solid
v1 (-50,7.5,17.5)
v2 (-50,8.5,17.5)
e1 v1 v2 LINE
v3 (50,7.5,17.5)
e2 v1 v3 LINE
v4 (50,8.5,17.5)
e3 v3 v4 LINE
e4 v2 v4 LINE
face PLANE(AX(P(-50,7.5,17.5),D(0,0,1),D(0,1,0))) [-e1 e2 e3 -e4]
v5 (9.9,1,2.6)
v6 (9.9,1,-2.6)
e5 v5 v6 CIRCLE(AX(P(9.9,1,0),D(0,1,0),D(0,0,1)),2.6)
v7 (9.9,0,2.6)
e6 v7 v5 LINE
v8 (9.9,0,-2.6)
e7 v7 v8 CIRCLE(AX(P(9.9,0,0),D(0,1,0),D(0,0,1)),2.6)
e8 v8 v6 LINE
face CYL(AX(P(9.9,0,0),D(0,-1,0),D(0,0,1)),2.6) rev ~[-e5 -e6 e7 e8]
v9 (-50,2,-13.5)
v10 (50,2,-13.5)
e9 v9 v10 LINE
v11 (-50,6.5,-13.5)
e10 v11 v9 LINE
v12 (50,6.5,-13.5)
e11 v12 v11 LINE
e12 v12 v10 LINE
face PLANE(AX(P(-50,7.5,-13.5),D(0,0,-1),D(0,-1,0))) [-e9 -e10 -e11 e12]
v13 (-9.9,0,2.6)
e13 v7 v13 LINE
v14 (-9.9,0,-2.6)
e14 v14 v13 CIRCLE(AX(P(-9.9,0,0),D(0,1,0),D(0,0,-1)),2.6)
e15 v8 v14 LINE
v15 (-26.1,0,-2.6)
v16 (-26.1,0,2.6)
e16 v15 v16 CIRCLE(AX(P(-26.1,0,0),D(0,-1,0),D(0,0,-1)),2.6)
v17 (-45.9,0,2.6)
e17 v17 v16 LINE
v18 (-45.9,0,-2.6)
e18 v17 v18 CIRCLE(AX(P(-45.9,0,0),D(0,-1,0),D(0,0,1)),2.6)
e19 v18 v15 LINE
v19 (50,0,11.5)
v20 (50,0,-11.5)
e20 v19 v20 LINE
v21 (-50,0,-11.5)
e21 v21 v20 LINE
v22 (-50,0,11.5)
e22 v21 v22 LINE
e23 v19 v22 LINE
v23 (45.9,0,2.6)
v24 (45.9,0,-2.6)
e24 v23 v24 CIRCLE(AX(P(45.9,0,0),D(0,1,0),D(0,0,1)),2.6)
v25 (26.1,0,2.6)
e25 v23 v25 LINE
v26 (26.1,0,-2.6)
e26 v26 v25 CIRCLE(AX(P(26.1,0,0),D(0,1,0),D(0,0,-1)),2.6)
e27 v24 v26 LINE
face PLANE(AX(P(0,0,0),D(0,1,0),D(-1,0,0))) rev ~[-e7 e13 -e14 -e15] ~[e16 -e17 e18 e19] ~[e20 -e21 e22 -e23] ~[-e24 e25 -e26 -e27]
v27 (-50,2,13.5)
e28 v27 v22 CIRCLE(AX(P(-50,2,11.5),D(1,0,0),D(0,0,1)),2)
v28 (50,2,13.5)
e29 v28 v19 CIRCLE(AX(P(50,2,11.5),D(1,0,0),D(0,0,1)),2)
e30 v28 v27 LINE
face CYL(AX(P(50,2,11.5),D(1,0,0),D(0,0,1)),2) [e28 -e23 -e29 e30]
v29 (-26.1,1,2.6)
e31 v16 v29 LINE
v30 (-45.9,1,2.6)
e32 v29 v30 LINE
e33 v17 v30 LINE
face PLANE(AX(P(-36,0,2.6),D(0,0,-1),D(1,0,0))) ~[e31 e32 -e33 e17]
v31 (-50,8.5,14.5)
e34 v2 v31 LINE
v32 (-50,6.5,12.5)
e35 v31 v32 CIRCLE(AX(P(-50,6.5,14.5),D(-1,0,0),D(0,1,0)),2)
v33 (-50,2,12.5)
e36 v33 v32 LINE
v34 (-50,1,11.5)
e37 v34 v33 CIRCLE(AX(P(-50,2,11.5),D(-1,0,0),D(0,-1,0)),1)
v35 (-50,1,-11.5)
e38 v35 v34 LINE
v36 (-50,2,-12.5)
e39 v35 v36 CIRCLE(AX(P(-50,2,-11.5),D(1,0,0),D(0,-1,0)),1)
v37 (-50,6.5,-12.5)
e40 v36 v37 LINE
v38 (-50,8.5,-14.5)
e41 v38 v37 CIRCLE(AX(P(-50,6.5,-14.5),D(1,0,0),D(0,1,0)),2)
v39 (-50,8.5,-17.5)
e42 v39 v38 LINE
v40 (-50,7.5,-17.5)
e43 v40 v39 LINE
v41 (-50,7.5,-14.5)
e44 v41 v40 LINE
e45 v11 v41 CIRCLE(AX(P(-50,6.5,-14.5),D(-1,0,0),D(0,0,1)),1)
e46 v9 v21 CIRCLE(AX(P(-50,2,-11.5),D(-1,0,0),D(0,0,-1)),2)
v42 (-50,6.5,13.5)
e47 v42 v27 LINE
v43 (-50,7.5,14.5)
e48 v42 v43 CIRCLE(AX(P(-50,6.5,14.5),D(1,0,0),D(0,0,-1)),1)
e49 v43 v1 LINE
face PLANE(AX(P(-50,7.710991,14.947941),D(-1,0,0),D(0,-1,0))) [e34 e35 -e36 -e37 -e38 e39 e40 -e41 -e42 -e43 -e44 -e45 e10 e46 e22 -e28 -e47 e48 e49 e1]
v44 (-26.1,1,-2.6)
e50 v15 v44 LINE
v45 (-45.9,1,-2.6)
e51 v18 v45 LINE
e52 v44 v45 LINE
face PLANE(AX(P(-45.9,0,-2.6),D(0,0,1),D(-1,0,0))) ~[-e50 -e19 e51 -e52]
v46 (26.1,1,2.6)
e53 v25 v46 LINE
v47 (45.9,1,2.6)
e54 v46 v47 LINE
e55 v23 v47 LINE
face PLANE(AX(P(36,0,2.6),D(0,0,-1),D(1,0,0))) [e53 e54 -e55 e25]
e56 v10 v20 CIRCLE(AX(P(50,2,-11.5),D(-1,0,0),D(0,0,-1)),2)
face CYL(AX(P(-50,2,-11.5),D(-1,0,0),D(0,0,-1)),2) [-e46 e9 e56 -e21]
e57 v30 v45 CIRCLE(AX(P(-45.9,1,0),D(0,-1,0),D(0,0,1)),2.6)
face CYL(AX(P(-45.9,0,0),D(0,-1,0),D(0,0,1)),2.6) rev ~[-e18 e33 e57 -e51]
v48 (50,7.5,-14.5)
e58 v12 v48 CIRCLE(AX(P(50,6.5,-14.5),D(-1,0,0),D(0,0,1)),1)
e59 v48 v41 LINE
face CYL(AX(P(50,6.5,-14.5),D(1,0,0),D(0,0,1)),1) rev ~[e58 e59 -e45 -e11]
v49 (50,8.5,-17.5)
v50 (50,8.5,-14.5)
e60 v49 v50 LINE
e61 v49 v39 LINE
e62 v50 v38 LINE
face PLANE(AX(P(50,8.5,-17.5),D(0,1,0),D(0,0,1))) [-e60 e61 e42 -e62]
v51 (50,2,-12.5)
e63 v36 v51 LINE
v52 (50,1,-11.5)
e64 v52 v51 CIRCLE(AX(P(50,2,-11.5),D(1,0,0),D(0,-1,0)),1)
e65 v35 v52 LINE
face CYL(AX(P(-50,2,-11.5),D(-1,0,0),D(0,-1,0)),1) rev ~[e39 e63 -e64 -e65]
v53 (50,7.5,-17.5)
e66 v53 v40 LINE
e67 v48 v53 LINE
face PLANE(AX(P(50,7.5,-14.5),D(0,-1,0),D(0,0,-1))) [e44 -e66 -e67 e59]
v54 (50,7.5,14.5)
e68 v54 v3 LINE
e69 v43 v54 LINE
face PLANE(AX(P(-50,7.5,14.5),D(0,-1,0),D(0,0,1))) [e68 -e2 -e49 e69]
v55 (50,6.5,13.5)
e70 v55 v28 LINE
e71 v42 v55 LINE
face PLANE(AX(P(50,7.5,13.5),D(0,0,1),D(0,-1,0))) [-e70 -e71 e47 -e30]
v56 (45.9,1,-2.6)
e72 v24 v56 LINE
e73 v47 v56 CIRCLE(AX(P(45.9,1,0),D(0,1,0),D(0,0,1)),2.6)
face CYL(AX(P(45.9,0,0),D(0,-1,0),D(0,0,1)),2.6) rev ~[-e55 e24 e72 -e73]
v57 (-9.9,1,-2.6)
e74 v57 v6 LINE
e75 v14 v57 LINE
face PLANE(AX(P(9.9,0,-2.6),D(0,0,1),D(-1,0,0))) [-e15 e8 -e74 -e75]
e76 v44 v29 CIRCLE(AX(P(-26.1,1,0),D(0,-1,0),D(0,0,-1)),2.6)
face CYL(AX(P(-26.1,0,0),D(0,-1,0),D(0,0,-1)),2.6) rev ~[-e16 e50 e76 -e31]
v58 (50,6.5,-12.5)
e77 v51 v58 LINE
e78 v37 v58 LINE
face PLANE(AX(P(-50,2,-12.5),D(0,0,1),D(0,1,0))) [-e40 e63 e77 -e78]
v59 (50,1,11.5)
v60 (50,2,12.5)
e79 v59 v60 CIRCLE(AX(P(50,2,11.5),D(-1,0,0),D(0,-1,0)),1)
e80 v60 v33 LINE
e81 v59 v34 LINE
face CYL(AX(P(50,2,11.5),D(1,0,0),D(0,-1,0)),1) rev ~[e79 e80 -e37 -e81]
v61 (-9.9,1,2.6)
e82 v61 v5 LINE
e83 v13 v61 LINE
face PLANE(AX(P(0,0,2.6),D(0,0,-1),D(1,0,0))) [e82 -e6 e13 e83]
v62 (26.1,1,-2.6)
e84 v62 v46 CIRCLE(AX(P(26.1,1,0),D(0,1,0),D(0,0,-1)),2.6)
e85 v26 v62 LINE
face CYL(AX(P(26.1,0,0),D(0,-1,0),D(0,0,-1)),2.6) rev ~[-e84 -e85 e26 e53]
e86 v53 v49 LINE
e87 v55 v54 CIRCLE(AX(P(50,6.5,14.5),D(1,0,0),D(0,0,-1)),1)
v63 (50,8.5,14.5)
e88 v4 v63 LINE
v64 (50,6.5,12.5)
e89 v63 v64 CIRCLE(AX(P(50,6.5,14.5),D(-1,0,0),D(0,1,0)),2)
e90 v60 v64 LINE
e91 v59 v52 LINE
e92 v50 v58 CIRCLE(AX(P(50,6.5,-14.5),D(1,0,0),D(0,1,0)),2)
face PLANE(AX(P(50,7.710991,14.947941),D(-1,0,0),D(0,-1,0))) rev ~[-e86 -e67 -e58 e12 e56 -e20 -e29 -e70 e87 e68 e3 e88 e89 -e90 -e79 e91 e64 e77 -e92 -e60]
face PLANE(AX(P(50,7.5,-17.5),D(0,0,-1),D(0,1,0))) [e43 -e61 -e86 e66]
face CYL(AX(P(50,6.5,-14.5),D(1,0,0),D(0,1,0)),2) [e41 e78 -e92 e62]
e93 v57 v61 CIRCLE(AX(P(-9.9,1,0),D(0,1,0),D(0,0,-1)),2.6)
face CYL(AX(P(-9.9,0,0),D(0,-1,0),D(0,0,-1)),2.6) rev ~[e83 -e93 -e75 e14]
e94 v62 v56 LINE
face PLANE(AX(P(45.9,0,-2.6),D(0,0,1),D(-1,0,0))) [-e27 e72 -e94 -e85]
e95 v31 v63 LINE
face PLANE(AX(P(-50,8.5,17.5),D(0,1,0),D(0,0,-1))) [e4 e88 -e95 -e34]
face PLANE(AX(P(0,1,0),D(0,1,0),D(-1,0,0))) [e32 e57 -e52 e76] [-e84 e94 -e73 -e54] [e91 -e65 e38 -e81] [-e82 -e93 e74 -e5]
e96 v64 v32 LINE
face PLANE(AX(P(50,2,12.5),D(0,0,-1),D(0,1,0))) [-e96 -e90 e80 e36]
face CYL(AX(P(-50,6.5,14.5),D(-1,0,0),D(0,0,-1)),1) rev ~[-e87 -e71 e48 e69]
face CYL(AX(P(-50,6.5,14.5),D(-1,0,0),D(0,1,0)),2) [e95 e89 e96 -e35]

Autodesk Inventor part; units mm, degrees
ref_plane "YZ Plane" through (0, 0, 0) normal (1, 0, 0) x (0, 1, 0)
ref_plane "XZ Plane" through (0, 0, 0) normal (0, 1, 0) x (-1, 0, 0)
ref_plane "XY Plane" through (0, 0, 0) normal (0, 0, 1) x (1, 0, 0)
sketch "Base Pattern" plane through (0, 0, 0) normal (0, 1, 0) x (-1, 0, 0)
  line L0 (50, 13.5) -> (-50, 13.5)
  line L1 (-50, 13.5) -> (-50, -13.5)
  line L2 (-50, -13.5) -> (50, -13.5)
  line L3 (50, -13.5) -> (50, 13.5)
  line L4 (50, 13.5) -> (-50, -13.5) construction
  line L5 (-50, 13.5) -> (50, -13.5) construction
  point P0 (0, 0)
  dimension "Length" = 100
  dimension "Base_Width" = 27
sketch "Slot Pattern Set-Out" plane through (0, 0, 0) normal (0, 1, 0) x (-1, 0, 0)
  line L0 (0, -25) -> (0, 25)
  line L1 (9.9, 2.6) -> (-9.9, 2.6)
  line L2 (-9.9, -2.6) -> (9.9, -2.6)
  arc A0 (9.9, -2.6) -> (9.9, 2.6) centre (9.9, 0) ccw
  arc A1 (-9.9, 2.6) -> (-9.9, -2.6) centre (-9.9, 0) ccw
  line L3 (32, 0) -> (-32, 0) construction
  line L4 (9.9, 0) -> (-9.9, 0) construction
  point P0 (0, 0)
  point P1 (0, 0)
  point P2 (0, 0)
  point P3 (0, 0)
  dimension "Slot_Length" = 19.8
  dimension "Slot_Dia" = 5.2
  dimension "Pattern_Length" = 64
extrude "Plate1" add sketch "Base Pattern" along normal blind 1
sketch "Sketch3" plane through (-50, 0, -12.5) normal (0, 0, -1) x (-1, 0, 0)
  line L0 (-100, 0) -> (0, 0)
  line L1 (0, 0) -> (0, 7.5)
  line L2 (0, 7.5) -> (-100, 7.5)
  line L3 (-100, 7.5) -> (-100, 0)
edge flange "Flange Side" height 7.5 angle 90 thickness 1 bend radius 1 thickness toward (0, 0, -1) relief tear relief width 1 relief depth 0.5 corner gap 1 corner form 0 edges at (0, 1, -13.5) (0, 1, 13.5) wall of the first edge with corners at (50, 0, -12.5) (-50, 0, -12.5) (-50, 7.5, -12.5) (50, 7.5, -12.5)
bend "Bend1"
corner "Corner1"
sketch "Sketch4" plane through (-50, 7.5, 13.5) normal (0, 1, 0) x (-1, 0, 0)
  line L0 (-100, 0) -> (0, 0)
  line L1 (0, 0) -> (0, 4)
  line L2 (0, 4) -> (-100, 4)
  line L3 (-100, 4) -> (-100, 0)
edge flange "Flange Nib" height 5 angle 90 thickness 1 bend radius 1 thickness toward (0, 1, 0) relief tear relief width 1 relief depth 0.5 corner gap 1 corner form 0 edges at (0, 7.5, 13.5) (0, 7.5, -13.5) wall of the first edge with corners at (50, 7.5, 13.5) (-50, 7.5, 13.5) (-50, 7.5, 17.5) (50, 7.5, 17.5)
bend "Bend2"
corner "Corner2"
extrude "Slot Cut-Out" cut sketch "Slot Pattern Set-Out" along normal blind 1
pattern_linear "Slot Pattern" count 2 spacing 36 along (1, 0, 0) of "Slot Cut-Out"
mirror "Slot Patern Mirror" about plane through (0, 0, 0) normal (1, 0, 0) of "Slot Cut-Out", "Slot Pattern"
equation "\"Slot_Length\" = Slot_Length_Effective"
equation "\"d28\" = Thickness"
equation "\"d30\" = 0.6 * Slots_Integer"
equation "\"d32\" = Slot_Spacing"
equation "\"d8\" = BendReliefWidth"
equation "\"d9\" = BendReliefDepth"
equation "\"d10\" = MinimumRemnant"
equation "\"d11\" = BendRadius"
equation "\"d12\" = Flange_Height"
equation "\"d14\" = BendRadius"
equation "\"d15\" = CornerReliefSize"
equation "\"d16\" = GapSize"
equation "\"d17\" = JacobiRadiusSize"
equation "\"d18\" = BendReliefWidth"
equation "\"d19\" = BendReliefDepth"
equation "\"d20\" = MinimumRemnant"
equation "\"d21\" = BendRadius"
equation "\"d22\" = Flange_Nib"
equation "\"d24\" = BendRadius"
equation "\"d25\" = CornerReliefSize"
equation "\"d26\" = GapSize"
equation "\"d27\" = JacobiRadiusSize"
equation "\"BendRadius\" = Thickness"
equation "\"BendReliefWidth\" = Thickness"
equation "\"BendReliefDepth\" = 0.5 * Thickness"
equation "\"CornerReliefSize\" = 4 * Thickness"
equation "\"MinimumRemnant\" = 2 * Thickness"
equation "\"TransitionRadius\" = BendRadius"
equation "\"JacobiRadiusSize\" = BendRadius"
equation "\"GapSize\" = Thickness"
equation "\"Flange_Height\" = 7.5"
equation "\"Slot_Spacing\" = 36"
equation "\"Flange_Nib\" = 5"
equation "\"Slot_Length_Tab\" = 25"
equation "\"Slot_Length_Effective\" = Slot_Length_Tab - Slot_Dia"
equation "\"Thickness\" = 1"
equation "\"Slots_Integer\" = 2.777778"
properties part number "DIN Rail (TS) 35mm Wide v1-01" material "Steel"
